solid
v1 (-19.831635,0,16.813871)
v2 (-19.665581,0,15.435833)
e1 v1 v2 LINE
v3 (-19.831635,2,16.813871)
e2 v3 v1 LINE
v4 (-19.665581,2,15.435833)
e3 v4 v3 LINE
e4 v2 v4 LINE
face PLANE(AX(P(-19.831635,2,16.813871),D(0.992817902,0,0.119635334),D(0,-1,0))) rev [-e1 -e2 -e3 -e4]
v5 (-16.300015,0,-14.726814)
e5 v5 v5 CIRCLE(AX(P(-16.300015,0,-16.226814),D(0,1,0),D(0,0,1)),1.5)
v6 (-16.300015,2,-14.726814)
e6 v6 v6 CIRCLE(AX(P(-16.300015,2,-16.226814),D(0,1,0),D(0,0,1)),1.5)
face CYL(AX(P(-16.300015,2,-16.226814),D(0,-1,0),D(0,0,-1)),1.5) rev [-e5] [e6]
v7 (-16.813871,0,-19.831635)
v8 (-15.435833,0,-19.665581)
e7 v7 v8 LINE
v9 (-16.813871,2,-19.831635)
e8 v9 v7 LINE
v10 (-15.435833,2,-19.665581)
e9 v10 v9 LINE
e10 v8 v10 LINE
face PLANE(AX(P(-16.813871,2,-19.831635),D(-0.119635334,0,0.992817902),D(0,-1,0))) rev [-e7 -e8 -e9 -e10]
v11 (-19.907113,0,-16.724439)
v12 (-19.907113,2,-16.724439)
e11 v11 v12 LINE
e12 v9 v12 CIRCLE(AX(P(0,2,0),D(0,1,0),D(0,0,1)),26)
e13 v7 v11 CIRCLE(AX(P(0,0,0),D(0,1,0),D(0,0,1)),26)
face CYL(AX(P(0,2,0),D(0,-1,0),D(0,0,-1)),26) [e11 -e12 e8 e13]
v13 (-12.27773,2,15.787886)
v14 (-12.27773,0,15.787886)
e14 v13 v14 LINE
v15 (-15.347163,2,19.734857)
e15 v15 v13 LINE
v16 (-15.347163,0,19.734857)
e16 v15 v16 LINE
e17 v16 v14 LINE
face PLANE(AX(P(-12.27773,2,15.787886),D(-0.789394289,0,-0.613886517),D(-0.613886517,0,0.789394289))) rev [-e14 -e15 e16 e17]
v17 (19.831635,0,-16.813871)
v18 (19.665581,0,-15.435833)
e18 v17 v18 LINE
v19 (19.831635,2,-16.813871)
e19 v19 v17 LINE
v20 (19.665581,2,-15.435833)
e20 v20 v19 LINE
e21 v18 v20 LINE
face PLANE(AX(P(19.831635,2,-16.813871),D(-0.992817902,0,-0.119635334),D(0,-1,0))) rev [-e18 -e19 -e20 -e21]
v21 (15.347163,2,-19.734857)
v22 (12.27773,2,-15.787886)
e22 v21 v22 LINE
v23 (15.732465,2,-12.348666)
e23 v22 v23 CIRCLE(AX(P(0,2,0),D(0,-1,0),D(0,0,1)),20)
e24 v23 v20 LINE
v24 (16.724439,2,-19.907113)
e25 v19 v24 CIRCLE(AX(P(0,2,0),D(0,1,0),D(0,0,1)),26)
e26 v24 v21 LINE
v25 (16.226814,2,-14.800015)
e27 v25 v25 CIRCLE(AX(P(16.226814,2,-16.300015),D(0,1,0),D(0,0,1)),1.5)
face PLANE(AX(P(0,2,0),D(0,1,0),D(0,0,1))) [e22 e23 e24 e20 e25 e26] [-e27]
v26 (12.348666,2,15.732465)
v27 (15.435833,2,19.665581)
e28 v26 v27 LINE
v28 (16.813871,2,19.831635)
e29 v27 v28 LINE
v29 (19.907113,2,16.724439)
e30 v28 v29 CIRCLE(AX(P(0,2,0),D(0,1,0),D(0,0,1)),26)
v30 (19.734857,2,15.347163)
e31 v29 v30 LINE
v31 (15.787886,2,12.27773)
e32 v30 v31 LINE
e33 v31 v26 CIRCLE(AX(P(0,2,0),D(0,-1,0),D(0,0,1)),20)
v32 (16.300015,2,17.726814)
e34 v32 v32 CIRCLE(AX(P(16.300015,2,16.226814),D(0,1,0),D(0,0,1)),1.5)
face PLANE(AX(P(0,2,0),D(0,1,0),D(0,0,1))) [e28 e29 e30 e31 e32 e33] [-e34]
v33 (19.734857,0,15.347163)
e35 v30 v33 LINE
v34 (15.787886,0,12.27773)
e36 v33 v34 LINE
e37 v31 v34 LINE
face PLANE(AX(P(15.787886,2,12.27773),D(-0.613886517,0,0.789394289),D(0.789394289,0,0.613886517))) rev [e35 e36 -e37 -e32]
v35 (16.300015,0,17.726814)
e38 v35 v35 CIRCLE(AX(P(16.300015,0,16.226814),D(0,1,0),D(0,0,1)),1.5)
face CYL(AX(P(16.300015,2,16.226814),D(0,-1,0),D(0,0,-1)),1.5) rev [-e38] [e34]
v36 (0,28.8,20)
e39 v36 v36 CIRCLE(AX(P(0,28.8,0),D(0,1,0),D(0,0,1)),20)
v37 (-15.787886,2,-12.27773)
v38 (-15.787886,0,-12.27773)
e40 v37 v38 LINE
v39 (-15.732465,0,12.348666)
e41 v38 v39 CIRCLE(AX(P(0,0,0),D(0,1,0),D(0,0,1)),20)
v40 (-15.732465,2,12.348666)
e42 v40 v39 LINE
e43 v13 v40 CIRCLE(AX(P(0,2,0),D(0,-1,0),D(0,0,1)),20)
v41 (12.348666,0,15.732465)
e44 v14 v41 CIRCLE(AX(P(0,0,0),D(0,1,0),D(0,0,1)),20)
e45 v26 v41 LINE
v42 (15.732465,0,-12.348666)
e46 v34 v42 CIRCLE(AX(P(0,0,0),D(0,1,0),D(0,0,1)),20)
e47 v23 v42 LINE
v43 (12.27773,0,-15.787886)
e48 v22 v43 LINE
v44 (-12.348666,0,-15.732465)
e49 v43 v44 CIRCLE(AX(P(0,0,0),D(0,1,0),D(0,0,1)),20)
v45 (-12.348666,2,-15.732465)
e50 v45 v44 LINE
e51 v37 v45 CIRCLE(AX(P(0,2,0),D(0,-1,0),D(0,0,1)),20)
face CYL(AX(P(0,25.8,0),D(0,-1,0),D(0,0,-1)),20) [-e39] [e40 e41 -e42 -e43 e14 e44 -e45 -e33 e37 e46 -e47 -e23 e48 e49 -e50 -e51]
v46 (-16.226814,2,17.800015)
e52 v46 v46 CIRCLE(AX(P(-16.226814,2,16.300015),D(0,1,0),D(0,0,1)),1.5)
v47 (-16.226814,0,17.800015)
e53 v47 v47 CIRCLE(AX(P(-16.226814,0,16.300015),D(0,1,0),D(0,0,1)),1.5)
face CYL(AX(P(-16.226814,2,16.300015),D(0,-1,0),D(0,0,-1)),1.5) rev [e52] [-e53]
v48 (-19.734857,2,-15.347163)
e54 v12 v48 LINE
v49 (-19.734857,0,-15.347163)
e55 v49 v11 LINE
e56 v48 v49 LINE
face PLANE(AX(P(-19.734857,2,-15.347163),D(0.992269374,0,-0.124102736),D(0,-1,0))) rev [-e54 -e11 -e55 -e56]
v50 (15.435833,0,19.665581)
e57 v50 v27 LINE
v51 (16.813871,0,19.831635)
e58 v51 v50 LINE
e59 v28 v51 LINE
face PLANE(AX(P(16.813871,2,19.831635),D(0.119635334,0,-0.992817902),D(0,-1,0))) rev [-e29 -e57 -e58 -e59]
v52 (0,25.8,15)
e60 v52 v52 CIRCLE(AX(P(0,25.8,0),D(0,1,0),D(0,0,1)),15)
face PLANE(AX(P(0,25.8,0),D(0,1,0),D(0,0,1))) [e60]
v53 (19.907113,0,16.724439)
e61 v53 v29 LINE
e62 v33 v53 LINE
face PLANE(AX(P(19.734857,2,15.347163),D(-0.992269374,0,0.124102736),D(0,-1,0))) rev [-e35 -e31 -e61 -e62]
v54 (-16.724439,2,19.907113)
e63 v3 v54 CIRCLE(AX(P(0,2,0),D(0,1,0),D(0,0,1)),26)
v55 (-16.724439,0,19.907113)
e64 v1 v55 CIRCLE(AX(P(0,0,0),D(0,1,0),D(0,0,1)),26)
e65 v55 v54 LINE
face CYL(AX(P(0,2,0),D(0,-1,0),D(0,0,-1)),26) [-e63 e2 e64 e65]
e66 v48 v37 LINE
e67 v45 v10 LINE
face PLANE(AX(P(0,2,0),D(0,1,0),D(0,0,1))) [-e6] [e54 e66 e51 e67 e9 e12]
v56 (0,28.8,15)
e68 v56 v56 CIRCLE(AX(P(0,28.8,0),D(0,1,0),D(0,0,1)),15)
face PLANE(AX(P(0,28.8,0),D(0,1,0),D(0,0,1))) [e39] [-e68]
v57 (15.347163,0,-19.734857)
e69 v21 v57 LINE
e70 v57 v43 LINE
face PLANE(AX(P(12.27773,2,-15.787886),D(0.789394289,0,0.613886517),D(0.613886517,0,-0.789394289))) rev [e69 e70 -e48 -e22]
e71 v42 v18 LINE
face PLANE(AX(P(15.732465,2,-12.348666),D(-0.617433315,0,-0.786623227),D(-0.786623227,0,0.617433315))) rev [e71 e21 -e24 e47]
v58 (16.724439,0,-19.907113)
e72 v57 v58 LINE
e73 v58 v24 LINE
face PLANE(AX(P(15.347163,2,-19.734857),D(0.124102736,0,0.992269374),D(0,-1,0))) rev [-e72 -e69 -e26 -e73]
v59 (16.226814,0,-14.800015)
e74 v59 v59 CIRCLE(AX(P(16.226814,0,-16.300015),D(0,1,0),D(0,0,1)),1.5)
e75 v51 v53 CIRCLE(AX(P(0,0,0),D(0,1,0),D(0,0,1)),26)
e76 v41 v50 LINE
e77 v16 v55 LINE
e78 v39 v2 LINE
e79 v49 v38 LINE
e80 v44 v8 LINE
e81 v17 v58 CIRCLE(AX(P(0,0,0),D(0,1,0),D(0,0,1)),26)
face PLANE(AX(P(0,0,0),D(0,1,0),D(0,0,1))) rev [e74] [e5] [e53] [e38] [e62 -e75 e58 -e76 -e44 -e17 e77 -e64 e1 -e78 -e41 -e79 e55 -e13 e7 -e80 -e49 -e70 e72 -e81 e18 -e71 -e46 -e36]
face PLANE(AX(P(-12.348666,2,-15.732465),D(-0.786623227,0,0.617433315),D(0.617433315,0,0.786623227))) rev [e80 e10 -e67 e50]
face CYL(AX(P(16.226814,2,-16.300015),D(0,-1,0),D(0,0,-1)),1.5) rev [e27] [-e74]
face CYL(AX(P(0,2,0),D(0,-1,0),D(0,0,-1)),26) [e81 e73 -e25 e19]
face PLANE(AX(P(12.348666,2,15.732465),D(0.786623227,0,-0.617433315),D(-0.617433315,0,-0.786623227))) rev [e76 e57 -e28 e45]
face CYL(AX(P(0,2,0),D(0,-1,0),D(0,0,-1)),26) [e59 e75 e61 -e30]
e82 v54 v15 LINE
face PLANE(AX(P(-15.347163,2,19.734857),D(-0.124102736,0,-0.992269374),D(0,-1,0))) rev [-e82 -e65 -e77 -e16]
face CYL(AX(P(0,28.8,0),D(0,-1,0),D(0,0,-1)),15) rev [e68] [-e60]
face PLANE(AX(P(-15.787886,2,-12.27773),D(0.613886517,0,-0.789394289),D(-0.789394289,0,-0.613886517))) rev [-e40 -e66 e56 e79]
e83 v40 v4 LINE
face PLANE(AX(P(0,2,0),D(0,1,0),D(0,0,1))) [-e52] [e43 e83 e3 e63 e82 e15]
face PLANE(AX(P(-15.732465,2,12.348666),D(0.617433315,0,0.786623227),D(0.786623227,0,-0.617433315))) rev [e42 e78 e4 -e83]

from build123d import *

# Parameters (mm, degrees)
SKETCH1_R           = 20
BOSS_EXTRUDE1_DEPTH = 25.8
SKETCH2_R           = 1.5
BOSS_EXTRUDE4_DEPTH = 2
CHAMFER1_SIZE       = 1
SKETCH3_R           = 20
SKETCH3_R_2         = 15
BOSS_EXTRUDE5_DEPTH = 3


with BuildPart() as part:
    # Sketch1 → Boss-Extrude1 (new body)
    with BuildSketch(Plane(origin=(0, 0, 0), x_dir=(1, 0, 0), z_dir=(0, 1, 0))):
        with Locations(Location((0, 0, 0), (0, 0, 90))):
            Circle(SKETCH1_R)
    extrude(amount=BOSS_EXTRUDE1_DEPTH)

    # Sketch2 → Boss-Extrude4 (add)
    # profile 1 of 4: a face of its own
    with BuildSketch(Plane(origin=(0, 0, 0), x_dir=(1, 0, 0), z_dir=(0, 1, 0))):
        with BuildLine():
            Line((-12.348666302, 15.732464542), (-16.053266193, 20.452203904))
            ThreePointArc((-16.053266193, 20.452203904), (-18.426104242, 18.343355267), (-20.524251517, 15.961049453))
            Line((-20.524251517, 15.961049453), (-15.787885783, 12.277730349))
            ThreePointArc((-15.787885783, 12.277730349), (-14.17392634, 14.110273282), (-12.348666302, 15.732464542))
        make_face()
        with Locations(Location((-16.300015291, 16.226814275, 0), (0, 0, 270))):
            Circle(SKETCH2_R, mode=Mode.SUBTRACT)
    # profile 2 of 4: a face of its own
    with BuildSketch(Plane(origin=(0, 0, 0), x_dir=(1, 0, 0), z_dir=(0, 1, 0))):
        with BuildLine():
            Line((15.732464542, 12.348666302), (20.452203904, 16.053266193))
            ThreePointArc((20.452203904, 16.053266193), (18.343355267, 18.426104242), (15.961049453, 20.524251517))
            Line((15.961049453, 20.524251517), (12.277730349, 15.787885783))
            ThreePointArc((12.277730349, 15.787885783), (14.110273282, 14.17392634), (15.732464542, 12.348666302))
        make_face()
        with Locations(Location((16.226814275, 16.300015291, 0), (0, 0, 270))):
            Circle(SKETCH2_R, mode=Mode.SUBTRACT)
    # profile 3 of 4: a face of its own
    with BuildSketch(Plane(origin=(0, 0, 0), x_dir=(1, 0, 0), z_dir=(0, 1, 0))):
        with BuildLine():
            Line((12.348666302, -15.732464542), (16.053266193, -20.452203904))
            ThreePointArc((16.053266193, -20.452203904), (18.426104242, -18.343355267), (20.524251517, -15.961049453))
            Line((20.524251517, -15.961049453), (15.787885783, -12.277730349))
            ThreePointArc((15.787885783, -12.277730349), (14.17392634, -14.110273282), (12.348666302, -15.732464542))
        make_face()
        with Locations(Location((16.300015291, -16.226814275, 0), (0, 0, 270))):
            Circle(SKETCH2_R, mode=Mode.SUBTRACT)
    # profile 4 of 4: a face of its own
    with BuildSketch(Plane(origin=(0, 0, 0), x_dir=(1, 0, 0), z_dir=(0, 1, 0))):
        with BuildLine():
            Line((-15.732464542, -12.348666302), (-20.452203904, -16.053266193))
            ThreePointArc((-20.452203904, -16.053266193), (-18.343355267, -18.426104242), (-15.961049453, -20.524251517))
            Line((-15.961049453, -20.524251517), (-12.277730349, -15.787885783))
            ThreePointArc((-12.277730349, -15.787885783), (-14.110273282, -14.17392634), (-15.732464542, -12.348666302))
        make_face()
        with Locations(Location((-16.226814275, -16.300015291, 0), (0, 0, 270))):
            Circle(SKETCH2_R, mode=Mode.SUBTRACT)
    extrude(amount=BOSS_EXTRUDE4_DEPTH)

    # Chamfer1
    # the kernel refuses this chamfer: 1 mm, written as the material it takes off along each edge
    with BuildSketch(Plane(origin=(-20.452203904, -2.571682988, 16.053266193), x_dir=(0.786623227084006, 0, -0.6174333151134171), z_dir=(0, 1, 0)), Plane(origin=(16.053266193, -2.571682988, 20.452203904), x_dir=(-0.6174333151134189, 0, -0.7866232270840047), z_dir=(0, 1, 0)), Plane(origin=(20.452203904, -2.571682988, -16.053266193), x_dir=(-0.7866232270840033, 0, 0.6174333151134205), z_dir=(0, 1, 0)), Plane(origin=(-16.053266193, -2.571682988, -20.452203904), x_dir=(0.6174333151134251, 0, 0.7866232270839999), z_dir=(0, 1, 0))) as chamfer1_piece_1:
        with BuildLine():
            Line((CHAMFER1_SIZE, 0), (0.018531237, -0.981468763))
            ThreePointArc((0.018531237, -0.981468763), (0.004898706, -0.504686734), (0, 0))
            Line((0, 0), (CHAMFER1_SIZE, 0))
        make_face()
    extrude(amount=7.143365976, mode=Mode.SUBTRACT)
    with BuildSketch(Plane(origin=(-15.961049453, -2.571682988, 20.524251517), x_dir=(0.6138865174304216, 0, -0.7893942891338579), z_dir=(0, 1, 0)), Plane(origin=(20.524251517, -2.571682988, 15.961049453), x_dir=(-0.7893942891338613, 0, -0.6138865174304171), z_dir=(0, 1, 0)), Plane(origin=(15.961049453, -2.571682988, -20.524251517), x_dir=(-0.6138865174304153, 0, 0.7893942891338627), z_dir=(0, 1, 0)), Plane(origin=(-20.524251517, -2.571682988, -15.961049453), x_dir=(0.7893942891338679, 0, 0.6138865174304086), z_dir=(0, 1, 0))) as chamfer1_piece_2:
        with BuildLine():
            Line((CHAMFER1_SIZE, 0), (0.018531237, 0.981468763))
            ThreePointArc((0.018531237, 0.981468763), (0.004898706, 0.504686734), (0, 0))
            Line((0, 0), (CHAMFER1_SIZE, 0))
        make_face()
    extrude(amount=7.143365976, mode=Mode.SUBTRACT)

    # Sketch3 → Boss-Extrude5 (add)
    with BuildSketch(Plane(origin=(0, 25.8, 0), x_dir=(1, 0, 0), z_dir=(0, 1, 0))):
        with Locations(Location((0, 0, 0), (0, 0, 52.128942853))):
            Circle(SKETCH3_R)
        with Locations(Location((0, 0, 0), (0, 0, 270))):
            Circle(SKETCH3_R_2, mode=Mode.SUBTRACT)
    extrude(amount=BOSS_EXTRUDE5_DEPTH)


solid = part.part
